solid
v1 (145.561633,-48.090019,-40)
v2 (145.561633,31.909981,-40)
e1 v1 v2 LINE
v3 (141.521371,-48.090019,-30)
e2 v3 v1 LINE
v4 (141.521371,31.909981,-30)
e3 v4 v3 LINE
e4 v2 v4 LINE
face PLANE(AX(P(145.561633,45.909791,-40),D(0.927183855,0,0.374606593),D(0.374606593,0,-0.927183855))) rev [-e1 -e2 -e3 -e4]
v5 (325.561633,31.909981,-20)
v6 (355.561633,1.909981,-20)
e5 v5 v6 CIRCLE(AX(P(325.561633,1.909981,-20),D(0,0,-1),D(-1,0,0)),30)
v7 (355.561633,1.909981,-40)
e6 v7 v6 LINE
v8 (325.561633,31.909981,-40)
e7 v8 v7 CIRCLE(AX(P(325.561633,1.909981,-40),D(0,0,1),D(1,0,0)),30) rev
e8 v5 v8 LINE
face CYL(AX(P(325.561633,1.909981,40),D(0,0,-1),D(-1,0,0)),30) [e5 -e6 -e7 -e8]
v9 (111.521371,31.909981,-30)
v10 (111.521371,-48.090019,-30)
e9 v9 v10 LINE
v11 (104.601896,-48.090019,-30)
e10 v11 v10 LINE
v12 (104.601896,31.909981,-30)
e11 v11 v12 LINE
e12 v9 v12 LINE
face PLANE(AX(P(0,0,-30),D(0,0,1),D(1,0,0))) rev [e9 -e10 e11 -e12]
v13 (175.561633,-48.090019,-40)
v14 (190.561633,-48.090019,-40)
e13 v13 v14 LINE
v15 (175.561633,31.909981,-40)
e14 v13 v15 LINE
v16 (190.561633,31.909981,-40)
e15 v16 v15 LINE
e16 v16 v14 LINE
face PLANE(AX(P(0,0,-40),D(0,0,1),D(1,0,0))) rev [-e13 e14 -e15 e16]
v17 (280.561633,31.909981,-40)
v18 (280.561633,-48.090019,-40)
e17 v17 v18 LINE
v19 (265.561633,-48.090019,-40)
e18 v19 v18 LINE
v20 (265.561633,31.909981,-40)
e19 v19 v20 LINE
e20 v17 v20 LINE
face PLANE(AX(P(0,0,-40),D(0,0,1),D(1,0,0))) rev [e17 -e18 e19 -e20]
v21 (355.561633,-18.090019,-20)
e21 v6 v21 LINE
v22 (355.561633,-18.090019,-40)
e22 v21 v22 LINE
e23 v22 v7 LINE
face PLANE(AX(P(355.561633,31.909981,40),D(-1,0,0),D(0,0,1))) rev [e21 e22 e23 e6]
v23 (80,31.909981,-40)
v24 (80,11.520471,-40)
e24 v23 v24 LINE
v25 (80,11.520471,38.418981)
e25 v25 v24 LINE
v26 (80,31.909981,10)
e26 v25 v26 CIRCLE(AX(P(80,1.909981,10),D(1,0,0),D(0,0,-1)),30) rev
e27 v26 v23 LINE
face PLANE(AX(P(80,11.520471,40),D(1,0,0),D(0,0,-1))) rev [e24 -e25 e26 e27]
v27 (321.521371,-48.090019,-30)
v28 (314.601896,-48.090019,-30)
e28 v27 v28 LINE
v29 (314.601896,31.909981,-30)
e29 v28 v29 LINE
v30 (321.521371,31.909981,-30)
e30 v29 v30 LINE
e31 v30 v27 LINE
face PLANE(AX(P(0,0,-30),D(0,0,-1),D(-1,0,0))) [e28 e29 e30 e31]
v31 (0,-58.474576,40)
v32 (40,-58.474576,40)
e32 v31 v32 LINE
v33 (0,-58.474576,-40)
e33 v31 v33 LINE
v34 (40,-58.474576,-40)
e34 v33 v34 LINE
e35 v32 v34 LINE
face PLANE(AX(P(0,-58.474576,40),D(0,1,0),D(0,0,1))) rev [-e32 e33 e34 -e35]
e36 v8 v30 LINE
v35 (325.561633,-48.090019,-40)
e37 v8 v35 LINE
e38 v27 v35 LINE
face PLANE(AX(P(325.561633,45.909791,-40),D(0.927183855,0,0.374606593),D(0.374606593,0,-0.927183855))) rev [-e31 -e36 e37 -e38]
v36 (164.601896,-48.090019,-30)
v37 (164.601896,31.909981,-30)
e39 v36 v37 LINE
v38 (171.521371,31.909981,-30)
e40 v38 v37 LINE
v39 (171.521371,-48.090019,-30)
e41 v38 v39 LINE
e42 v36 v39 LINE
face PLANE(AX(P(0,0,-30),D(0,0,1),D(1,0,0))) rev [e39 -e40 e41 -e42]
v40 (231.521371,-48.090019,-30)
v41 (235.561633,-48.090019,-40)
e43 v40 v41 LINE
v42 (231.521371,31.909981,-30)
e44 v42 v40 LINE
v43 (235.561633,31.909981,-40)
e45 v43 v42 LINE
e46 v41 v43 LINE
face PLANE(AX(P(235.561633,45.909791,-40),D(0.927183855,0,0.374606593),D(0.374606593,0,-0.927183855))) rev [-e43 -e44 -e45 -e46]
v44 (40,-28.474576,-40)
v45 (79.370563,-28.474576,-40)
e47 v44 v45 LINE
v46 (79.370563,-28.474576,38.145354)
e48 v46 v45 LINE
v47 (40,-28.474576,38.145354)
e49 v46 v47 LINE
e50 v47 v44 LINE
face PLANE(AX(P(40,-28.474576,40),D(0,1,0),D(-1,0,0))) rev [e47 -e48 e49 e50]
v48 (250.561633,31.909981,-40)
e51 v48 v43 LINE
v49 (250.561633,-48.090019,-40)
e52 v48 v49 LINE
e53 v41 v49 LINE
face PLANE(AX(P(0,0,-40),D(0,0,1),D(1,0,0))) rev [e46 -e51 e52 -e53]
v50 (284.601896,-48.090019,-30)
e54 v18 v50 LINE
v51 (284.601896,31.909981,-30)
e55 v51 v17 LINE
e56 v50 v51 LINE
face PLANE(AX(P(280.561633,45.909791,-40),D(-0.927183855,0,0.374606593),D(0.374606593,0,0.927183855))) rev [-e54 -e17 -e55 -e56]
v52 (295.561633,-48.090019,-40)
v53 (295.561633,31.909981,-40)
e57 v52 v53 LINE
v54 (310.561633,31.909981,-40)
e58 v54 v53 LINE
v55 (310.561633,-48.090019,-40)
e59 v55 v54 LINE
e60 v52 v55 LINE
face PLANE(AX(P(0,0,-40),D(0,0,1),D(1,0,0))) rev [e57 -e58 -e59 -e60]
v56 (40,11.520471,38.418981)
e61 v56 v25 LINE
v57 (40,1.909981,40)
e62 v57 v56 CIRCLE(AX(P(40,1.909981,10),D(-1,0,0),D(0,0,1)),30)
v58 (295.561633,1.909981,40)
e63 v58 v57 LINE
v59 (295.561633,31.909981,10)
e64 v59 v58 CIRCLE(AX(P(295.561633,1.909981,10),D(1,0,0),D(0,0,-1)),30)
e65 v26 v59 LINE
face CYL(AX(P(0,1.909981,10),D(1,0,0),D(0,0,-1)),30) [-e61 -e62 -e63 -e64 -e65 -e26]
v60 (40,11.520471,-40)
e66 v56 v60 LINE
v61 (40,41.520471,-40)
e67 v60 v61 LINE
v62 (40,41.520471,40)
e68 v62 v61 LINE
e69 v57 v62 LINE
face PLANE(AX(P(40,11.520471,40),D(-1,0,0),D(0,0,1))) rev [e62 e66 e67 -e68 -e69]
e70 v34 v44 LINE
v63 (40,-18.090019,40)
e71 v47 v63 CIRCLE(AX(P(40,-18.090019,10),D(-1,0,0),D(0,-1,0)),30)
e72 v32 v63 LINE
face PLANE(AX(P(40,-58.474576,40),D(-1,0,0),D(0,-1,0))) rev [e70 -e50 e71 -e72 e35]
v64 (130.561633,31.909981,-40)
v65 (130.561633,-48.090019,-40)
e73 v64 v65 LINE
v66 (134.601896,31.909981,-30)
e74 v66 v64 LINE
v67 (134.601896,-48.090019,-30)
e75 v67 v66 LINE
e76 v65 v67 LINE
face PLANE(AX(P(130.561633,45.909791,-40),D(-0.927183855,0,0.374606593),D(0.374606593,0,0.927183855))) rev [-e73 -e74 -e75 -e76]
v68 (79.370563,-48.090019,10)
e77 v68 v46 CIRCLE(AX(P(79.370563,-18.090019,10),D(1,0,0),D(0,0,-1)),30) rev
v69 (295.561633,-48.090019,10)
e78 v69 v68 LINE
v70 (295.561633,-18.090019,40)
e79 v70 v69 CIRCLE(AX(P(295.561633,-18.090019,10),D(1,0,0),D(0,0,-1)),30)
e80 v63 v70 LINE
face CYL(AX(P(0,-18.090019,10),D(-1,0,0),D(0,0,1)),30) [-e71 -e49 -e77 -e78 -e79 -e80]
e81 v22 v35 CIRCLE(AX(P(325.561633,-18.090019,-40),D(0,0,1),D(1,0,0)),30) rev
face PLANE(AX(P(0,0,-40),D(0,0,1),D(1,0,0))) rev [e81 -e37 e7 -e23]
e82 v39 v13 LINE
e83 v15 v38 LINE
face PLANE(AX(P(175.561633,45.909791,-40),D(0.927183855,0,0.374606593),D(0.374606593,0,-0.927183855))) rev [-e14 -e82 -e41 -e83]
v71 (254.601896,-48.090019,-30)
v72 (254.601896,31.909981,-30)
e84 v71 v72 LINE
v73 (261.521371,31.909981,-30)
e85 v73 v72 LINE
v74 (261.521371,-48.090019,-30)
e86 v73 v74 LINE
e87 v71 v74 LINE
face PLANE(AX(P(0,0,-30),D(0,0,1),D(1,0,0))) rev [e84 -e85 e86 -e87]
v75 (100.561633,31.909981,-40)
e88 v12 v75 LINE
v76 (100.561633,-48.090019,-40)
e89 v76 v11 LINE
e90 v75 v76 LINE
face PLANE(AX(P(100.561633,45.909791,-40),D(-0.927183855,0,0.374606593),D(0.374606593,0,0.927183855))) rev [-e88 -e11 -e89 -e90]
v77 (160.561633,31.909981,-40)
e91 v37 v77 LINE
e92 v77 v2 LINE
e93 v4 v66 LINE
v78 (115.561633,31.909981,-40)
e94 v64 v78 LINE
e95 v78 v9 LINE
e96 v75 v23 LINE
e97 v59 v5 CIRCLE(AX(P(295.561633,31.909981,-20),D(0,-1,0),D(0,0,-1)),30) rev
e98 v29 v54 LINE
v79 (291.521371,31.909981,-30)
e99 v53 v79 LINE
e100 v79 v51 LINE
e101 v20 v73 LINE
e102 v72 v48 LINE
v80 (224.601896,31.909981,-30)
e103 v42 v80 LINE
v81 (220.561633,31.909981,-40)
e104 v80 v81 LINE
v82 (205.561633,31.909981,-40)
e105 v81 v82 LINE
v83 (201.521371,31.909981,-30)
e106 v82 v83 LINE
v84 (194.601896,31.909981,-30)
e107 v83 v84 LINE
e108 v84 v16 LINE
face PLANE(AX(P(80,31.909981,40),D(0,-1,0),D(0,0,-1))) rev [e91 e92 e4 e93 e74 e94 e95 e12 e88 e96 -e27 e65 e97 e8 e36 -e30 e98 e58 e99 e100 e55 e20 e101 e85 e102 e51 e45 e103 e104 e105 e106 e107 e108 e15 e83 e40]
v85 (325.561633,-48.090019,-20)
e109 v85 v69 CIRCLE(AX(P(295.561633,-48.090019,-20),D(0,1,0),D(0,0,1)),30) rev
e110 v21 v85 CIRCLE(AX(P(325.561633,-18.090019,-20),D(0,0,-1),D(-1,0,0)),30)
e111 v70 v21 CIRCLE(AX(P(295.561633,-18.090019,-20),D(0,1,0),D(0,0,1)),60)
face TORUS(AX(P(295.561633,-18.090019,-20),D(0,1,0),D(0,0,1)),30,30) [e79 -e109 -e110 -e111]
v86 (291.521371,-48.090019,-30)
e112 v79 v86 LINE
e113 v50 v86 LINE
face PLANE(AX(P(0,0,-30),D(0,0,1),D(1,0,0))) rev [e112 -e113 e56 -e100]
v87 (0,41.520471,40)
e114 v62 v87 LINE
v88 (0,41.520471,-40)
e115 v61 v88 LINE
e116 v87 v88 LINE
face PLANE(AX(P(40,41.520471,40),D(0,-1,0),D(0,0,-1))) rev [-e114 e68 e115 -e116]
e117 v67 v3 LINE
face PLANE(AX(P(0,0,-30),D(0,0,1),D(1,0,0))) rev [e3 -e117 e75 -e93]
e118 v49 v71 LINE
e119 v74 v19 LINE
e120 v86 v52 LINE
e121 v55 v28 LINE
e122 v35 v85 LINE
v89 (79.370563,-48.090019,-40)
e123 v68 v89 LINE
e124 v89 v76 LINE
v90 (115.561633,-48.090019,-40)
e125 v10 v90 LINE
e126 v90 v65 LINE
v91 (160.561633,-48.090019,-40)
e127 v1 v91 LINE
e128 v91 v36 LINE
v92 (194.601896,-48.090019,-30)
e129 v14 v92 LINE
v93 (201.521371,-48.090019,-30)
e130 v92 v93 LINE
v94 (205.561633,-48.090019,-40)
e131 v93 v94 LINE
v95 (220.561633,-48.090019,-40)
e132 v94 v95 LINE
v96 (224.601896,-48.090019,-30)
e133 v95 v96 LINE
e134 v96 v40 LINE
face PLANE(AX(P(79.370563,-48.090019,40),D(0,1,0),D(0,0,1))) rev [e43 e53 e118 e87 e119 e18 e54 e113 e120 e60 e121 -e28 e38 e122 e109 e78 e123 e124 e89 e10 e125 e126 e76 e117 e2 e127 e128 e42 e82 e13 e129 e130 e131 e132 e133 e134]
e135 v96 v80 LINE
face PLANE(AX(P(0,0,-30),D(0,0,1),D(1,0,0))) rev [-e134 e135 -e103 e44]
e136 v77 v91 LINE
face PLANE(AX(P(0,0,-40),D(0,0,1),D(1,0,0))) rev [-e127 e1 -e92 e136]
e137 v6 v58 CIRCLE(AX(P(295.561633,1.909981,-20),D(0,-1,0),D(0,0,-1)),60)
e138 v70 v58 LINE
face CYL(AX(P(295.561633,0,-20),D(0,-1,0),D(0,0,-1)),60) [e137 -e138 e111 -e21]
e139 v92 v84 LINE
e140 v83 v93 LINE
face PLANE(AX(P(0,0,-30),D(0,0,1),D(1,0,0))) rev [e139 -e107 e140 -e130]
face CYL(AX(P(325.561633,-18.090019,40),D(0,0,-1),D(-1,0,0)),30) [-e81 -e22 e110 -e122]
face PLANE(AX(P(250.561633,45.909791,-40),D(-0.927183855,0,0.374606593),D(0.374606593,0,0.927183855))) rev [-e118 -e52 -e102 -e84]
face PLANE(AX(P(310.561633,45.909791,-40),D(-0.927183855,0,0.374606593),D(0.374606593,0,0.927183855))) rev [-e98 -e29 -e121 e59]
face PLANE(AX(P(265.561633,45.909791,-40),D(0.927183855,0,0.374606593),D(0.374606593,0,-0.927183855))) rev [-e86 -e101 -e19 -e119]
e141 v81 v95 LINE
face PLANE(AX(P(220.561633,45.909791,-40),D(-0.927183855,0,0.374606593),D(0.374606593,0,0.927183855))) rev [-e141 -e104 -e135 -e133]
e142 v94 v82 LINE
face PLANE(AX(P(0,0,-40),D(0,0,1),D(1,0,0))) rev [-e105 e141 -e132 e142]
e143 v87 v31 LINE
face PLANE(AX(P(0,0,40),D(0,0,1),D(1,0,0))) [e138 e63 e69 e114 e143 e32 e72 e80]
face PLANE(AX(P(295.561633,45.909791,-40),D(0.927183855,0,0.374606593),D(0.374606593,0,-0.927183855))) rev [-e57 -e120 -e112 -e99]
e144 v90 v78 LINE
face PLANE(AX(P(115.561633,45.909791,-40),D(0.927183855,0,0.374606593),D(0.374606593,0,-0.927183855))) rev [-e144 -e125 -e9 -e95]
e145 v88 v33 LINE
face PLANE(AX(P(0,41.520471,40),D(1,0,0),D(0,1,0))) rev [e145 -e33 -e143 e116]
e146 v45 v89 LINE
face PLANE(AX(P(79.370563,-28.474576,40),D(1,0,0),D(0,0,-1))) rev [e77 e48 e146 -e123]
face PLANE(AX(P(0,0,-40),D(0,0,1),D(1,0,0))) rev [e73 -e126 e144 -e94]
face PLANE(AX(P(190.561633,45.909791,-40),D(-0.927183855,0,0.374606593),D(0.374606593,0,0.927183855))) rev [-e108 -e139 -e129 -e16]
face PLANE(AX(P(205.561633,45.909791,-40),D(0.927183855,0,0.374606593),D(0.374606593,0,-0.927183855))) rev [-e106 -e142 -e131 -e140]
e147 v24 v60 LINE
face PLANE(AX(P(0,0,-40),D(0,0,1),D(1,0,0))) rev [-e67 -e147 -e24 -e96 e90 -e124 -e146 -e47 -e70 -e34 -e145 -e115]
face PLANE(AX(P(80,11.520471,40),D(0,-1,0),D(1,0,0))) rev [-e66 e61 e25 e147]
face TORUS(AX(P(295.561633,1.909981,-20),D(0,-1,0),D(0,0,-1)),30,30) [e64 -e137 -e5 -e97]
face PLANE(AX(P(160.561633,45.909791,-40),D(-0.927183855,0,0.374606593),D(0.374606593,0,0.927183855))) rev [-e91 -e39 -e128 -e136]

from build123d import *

# Parameters (mm, degrees)
BOSS_EXTRUDE1_DEPTH          = 40
FILLET1_R                    = 60
FILLET2_R                    = 30
SKETCH3_W                    = 15
SKETCH3_H                    = 109.922704731
CUT_EXTRUDE1_DEPTH           = 10
CUT_EXTRUDE1_DRAFT           = -22
CUT_EXTRUDE1_PROFILE_2_DEPTH = 10
CUT_EXTRUDE1_PROFILE_2_DRAFT = -22
CUT_EXTRUDE1_PROFILE_3_DEPTH = 10
CUT_EXTRUDE1_PROFILE_3_DRAFT = -22
CUT_EXTRUDE1_PROFILE_4_DEPTH = 10
CUT_EXTRUDE1_PROFILE_4_DRAFT = -22
CUT_EXTRUDE1_PROFILE_5_DEPTH = 10
CUT_EXTRUDE1_PROFILE_5_DRAFT = -22
CUT_EXTRUDE1_PROFILE_6_DEPTH = 10
CUT_EXTRUDE1_PROFILE_6_DRAFT = -22
CUT_EXTRUDE1_PROFILE_7_DEPTH = 10
CUT_EXTRUDE1_PROFILE_7_DRAFT = -22
CUT_EXTRUDE1_PROFILE_8_DEPTH = 10
CUT_EXTRUDE1_PROFILE_8_DRAFT = -22


with BuildPart() as part:
    # Sketch1 → Boss-Extrude1 (new, symmetric)
    with BuildSketch(Plane.XY):
        Polygon((0, 41.520471033), (0, -58.474576271), (40, -58.474576271), (40, -28.474576271), (79.370562847, -28.474576271), (79.370562847, -48.090018927), (355.561633386, -48.090018927), (355.561633386, -28.474576271), (355.561633386, 11.525423729), (355.561633386, 31.909981073), (80, 31.909981073), (80, 11.520471033), (40, 11.520471033), (40, 41.520471033), align=None)
    extrude(amount=BOSS_EXTRUDE1_DEPTH, both=True)

    # Fillet1
    fillet1_edges = [part.edges().sort_by_distance(p)[0] for p in [
        (355.561633386, -8.090018927, 40),
    ]]
    fillet(fillet1_edges, radius=FILLET1_R)

    # Fillet2
    # the kernel refuses this fillet: 30 mm, written as the material it takes off along each edge
    with BuildSketch(Plane(origin=(355.561633386, -48.090018927, -115), x_dir=(0, 1, 0), z_dir=(0, 0, 1)), Plane(origin=(355.561633386, 31.909981073, -115), x_dir=(-1, 0, 0), z_dir=(0, 0, 1))) as fillet2_piece_1:
        with BuildLine():
            CenterArc((FILLET2_R, FILLET2_R), FILLET2_R, 180, 90)
            Line((0, FILLET2_R), (0, 0))
            Line((0, 0), (FILLET2_R, 0))
        make_face()
    extrude(amount=95, mode=Mode.SUBTRACT)
    with BuildSketch(Plane(origin=(295.561633386, -48.090018927, -20), x_dir=(1, 0, 0), z_dir=(0, 0, -1))) as fillet2_piece_2:
        with BuildLine():
            CenterArc((60 - FILLET2_R, -FILLET2_R), FILLET2_R, 0, 90)
            Line((60 - FILLET2_R, 0), (60, 0))
            Line((60, 0), (60, -FILLET2_R))
        make_face()
    revolve(axis=Axis((295.561633386, -48.090018927, -20), (0, -1, 0)), revolution_arc=90, mode=Mode.SUBTRACT)
    with BuildSketch(Plane(origin=(295.561633386, 31.909981073, -20), x_dir=(1, 0, 0), z_dir=(0, 0, -1))) as fillet2_piece_3:
        with BuildLine():
            CenterArc((60 - FILLET2_R, FILLET2_R), FILLET2_R, 270, 90)
            Line((60, FILLET2_R), (60, 0))
            Line((60, 0), (60 - FILLET2_R, 0))
        make_face()
    revolve(axis=Axis((295.561633386, 31.909981073, -20), (0, -1, 0)), revolution_arc=90, mode=Mode.SUBTRACT)
    with BuildSketch(Plane(origin=(4.370562847, -48.090018927, 40), x_dir=(0, 1, 0), z_dir=(1, 0, 0))) as fillet2_piece_4_section:
        with BuildLine():
            CenterArc((FILLET2_R, -FILLET2_R), FILLET2_R, 90, 90)
            Line((0, -FILLET2_R), (0, 0))
            Line((0, 0), (FILLET2_R, 0))
        make_face()
    fillet2_piece_4 = extrude(amount=291.191070539, mode=Mode.PRIVATE)
    fillet2_piece_4 = split(fillet2_piece_4, bisect_by=Plane(origin=(40, -25.894757841, 39.446684124), z_dir=(1, 0, 0)), keep=Keep.TOP, mode=Mode.PRIVATE)
    add(fillet2_piece_4, mode=Mode.SUBTRACT)
    with BuildSketch(Plane(origin=(295.561633386, 31.909981073, 40), x_dir=(0, 0, -1), z_dir=(-1, 0, 0))) as fillet2_piece_5_section:
        with BuildLine():
            CenterArc((FILLET2_R, FILLET2_R), FILLET2_R, 180, 90)
            Line((0, FILLET2_R), (0, 0))
            Line((0, 0), (FILLET2_R, 0))
        make_face()
    fillet2_piece_5 = extrude(amount=290.561633386, mode=Mode.PRIVATE)
    fillet2_piece_5 = split(fillet2_piece_5, bisect_by=Plane(origin=(40, 26.935715602, 30.794780606), z_dir=(1, 0, 0)), keep=Keep.TOP, mode=Mode.PRIVATE)
    add(fillet2_piece_5, mode=Mode.SUBTRACT)


with BuildPart() as cut_extrude1_tool:
    # Sketch3 → Cut-Extrude1 (with draft: the straight prism first)
    with BuildSketch(Plane(origin=(0, 0, -40), x_dir=(-1, 0, 0), z_dir=(0, 0, -1))):
        with Locations((-318.061633386, -9.051561529)):
            Rectangle(SKETCH3_W, SKETCH3_H)
    extrude(amount=-CUT_EXTRUDE1_DEPTH)
    # Cut-Extrude1: the draft: its side faces are tilted about the plane it starts from
    cut_extrude1_sides = [cut_extrude1_tool.faces().sort_by_distance(p)[0] for p in [
        (325.561633386, -9.051561529, -35),
        (318.061633386, -64.012913894, -35),
        (310.561633386, -9.051561529, -35),
        (318.061633386, 45.909790837, -35),
    ]]
    draft(cut_extrude1_sides, Plane(origin=(0, 0, -40), x_dir=(-1, 0, 0), z_dir=(0, 0, -1)), CUT_EXTRUDE1_DRAFT)


with BuildPart() as part_1:
    add(part.part)

    # Cut-Extrude1: cut by cut_extrude1_tool
    add(cut_extrude1_tool.part, mode=Mode.SUBTRACT)


with BuildPart() as cut_extrude1_profile_2_tool:
    # Sketch3 → Cut-Extrude1 profile 2 (with draft: the straight prism first)
    with BuildSketch(Plane(origin=(0, 0, -40), x_dir=(-1, 0, 0), z_dir=(0, 0, -1))):
        with Locations((-288.061633386, -9.051561529)):
            Rectangle(SKETCH3_W, SKETCH3_H)
    extrude(amount=-CUT_EXTRUDE1_PROFILE_2_DEPTH)
    # Cut-Extrude1 profile 2: the draft: its side faces are tilted about the plane it starts from
    cut_extrude1_profile_2_sides = [cut_extrude1_profile_2_tool.faces().sort_by_distance(p)[0] for p in [
        (295.561633386, -9.051561529, -35),
        (288.061633386, -64.012913894, -35),
        (280.561633386, -9.051561529, -35),
        (288.061633386, 45.909790837, -35),
    ]]
    draft(cut_extrude1_profile_2_sides, Plane(origin=(0, 0, -40), x_dir=(-1, 0, 0), z_dir=(0, 0, -1)), CUT_EXTRUDE1_PROFILE_2_DRAFT)


with BuildPart() as part_2:
    add(part_1.part)

    # Cut-Extrude1 profile 2: cut by cut_extrude1_profile_2_tool
    add(cut_extrude1_profile_2_tool.part, mode=Mode.SUBTRACT)


with BuildPart() as cut_extrude1_profile_3_tool:
    # Sketch3 → Cut-Extrude1 profile 3 (with draft: the straight prism first)
    with BuildSketch(Plane(origin=(0, 0, -40), x_dir=(-1, 0, 0), z_dir=(0, 0, -1))):
        with Locations((-258.061633386, -9.051561529)):
            Rectangle(SKETCH3_W, SKETCH3_H)
    extrude(amount=-CUT_EXTRUDE1_PROFILE_3_DEPTH)
    # Cut-Extrude1 profile 3: the draft: its side faces are tilted about the plane it starts from
    cut_extrude1_profile_3_sides = [cut_extrude1_profile_3_tool.faces().sort_by_distance(p)[0] for p in [
        (265.561633386, -9.051561529, -35),
        (258.061633386, -64.012913894, -35),
        (250.561633386, -9.051561529, -35),
        (258.061633386, 45.909790837, -35),
    ]]
    draft(cut_extrude1_profile_3_sides, Plane(origin=(0, 0, -40), x_dir=(-1, 0, 0), z_dir=(0, 0, -1)), CUT_EXTRUDE1_PROFILE_3_DRAFT)


with BuildPart() as part_3:
    add(part_2.part)

    # Cut-Extrude1 profile 3: cut by cut_extrude1_profile_3_tool
    add(cut_extrude1_profile_3_tool.part, mode=Mode.SUBTRACT)


with BuildPart() as cut_extrude1_profile_4_tool:
    # Sketch3 → Cut-Extrude1 profile 4 (with draft: the straight prism first)
    with BuildSketch(Plane(origin=(0, 0, -40), x_dir=(-1, 0, 0), z_dir=(0, 0, -1))):
        with Locations((-228.061633386, -9.051561529)):
            Rectangle(SKETCH3_W, SKETCH3_H)
    extrude(amount=-CUT_EXTRUDE1_PROFILE_4_DEPTH)
    # Cut-Extrude1 profile 4: the draft: its side faces are tilted about the plane it starts from
    cut_extrude1_profile_4_sides = [cut_extrude1_profile_4_tool.faces().sort_by_distance(p)[0] for p in [
        (235.561633386, -9.051561529, -35),
        (228.061633386, -64.012913894, -35),
        (220.561633386, -9.051561529, -35),
        (228.061633386, 45.909790837, -35),
    ]]
    draft(cut_extrude1_profile_4_sides, Plane(origin=(0, 0, -40), x_dir=(-1, 0, 0), z_dir=(0, 0, -1)), CUT_EXTRUDE1_PROFILE_4_DRAFT)


with BuildPart() as part_4:
    add(part_3.part)

    # Cut-Extrude1 profile 4: cut by cut_extrude1_profile_4_tool
    add(cut_extrude1_profile_4_tool.part, mode=Mode.SUBTRACT)


with BuildPart() as cut_extrude1_profile_5_tool:
    # Sketch3 → Cut-Extrude1 profile 5 (with draft: the straight prism first)
    with BuildSketch(Plane(origin=(0, 0, -40), x_dir=(-1, 0, 0), z_dir=(0, 0, -1))):
        with Locations((-198.061633386, -9.051561529)):
            Rectangle(SKETCH3_W, SKETCH3_H)
    extrude(amount=-CUT_EXTRUDE1_PROFILE_5_DEPTH)
    # Cut-Extrude1 profile 5: the draft: its side faces are tilted about the plane it starts from
    cut_extrude1_profile_5_sides = [cut_extrude1_profile_5_tool.faces().sort_by_distance(p)[0] for p in [
        (205.561633386, -9.051561529, -35),
        (198.061633386, -64.012913894, -35),
        (190.561633386, -9.051561529, -35),
        (198.061633386, 45.909790837, -35),
    ]]
    draft(cut_extrude1_profile_5_sides, Plane(origin=(0, 0, -40), x_dir=(-1, 0, 0), z_dir=(0, 0, -1)), CUT_EXTRUDE1_PROFILE_5_DRAFT)


with BuildPart() as part_5:
    add(part_4.part)

    # Cut-Extrude1 profile 5: cut by cut_extrude1_profile_5_tool
    add(cut_extrude1_profile_5_tool.part, mode=Mode.SUBTRACT)


with BuildPart() as cut_extrude1_profile_6_tool:
    # Sketch3 → Cut-Extrude1 profile 6 (with draft: the straight prism first)
    with BuildSketch(Plane(origin=(0, 0, -40), x_dir=(-1, 0, 0), z_dir=(0, 0, -1))):
        with Locations((-168.061633386, -9.051561529)):
            Rectangle(SKETCH3_W, SKETCH3_H)
    extrude(amount=-CUT_EXTRUDE1_PROFILE_6_DEPTH)
    # Cut-Extrude1 profile 6: the draft: its side faces are tilted about the plane it starts from
    cut_extrude1_profile_6_sides = [cut_extrude1_profile_6_tool.faces().sort_by_distance(p)[0] for p in [
        (175.561633386, -9.051561529, -35),
        (168.061633386, -64.012913894, -35),
        (160.561633386, -9.051561529, -35),
        (168.061633386, 45.909790837, -35),
    ]]
    draft(cut_extrude1_profile_6_sides, Plane(origin=(0, 0, -40), x_dir=(-1, 0, 0), z_dir=(0, 0, -1)), CUT_EXTRUDE1_PROFILE_6_DRAFT)


with BuildPart() as part_6:
    add(part_5.part)

    # Cut-Extrude1 profile 6: cut by cut_extrude1_profile_6_tool
    add(cut_extrude1_profile_6_tool.part, mode=Mode.SUBTRACT)


with BuildPart() as cut_extrude1_profile_7_tool:
    # Sketch3 → Cut-Extrude1 profile 7 (with draft: the straight prism first)
    with BuildSketch(Plane(origin=(0, 0, -40), x_dir=(-1, 0, 0), z_dir=(0, 0, -1))):
        with Locations((-138.061633386, -9.051561529)):
            Rectangle(SKETCH3_W, SKETCH3_H)
    extrude(amount=-CUT_EXTRUDE1_PROFILE_7_DEPTH)
    # Cut-Extrude1 profile 7: the draft: its side faces are tilted about the plane it starts from
    cut_extrude1_profile_7_sides = [cut_extrude1_profile_7_tool.faces().sort_by_distance(p)[0] for p in [
        (145.561633386, -9.051561529, -35),
        (138.061633386, -64.012913894, -35),
        (130.561633386, -9.051561529, -35),
        (138.061633386, 45.909790837, -35),
    ]]
    draft(cut_extrude1_profile_7_sides, Plane(origin=(0, 0, -40), x_dir=(-1, 0, 0), z_dir=(0, 0, -1)), CUT_EXTRUDE1_PROFILE_7_DRAFT)


with BuildPart() as part_7:
    add(part_6.part)

    # Cut-Extrude1 profile 7: cut by cut_extrude1_profile_7_tool
    add(cut_extrude1_profile_7_tool.part, mode=Mode.SUBTRACT)


with BuildPart() as cut_extrude1_profile_8_tool:
    # Sketch3 → Cut-Extrude1 profile 8 (with draft: the straight prism first)
    with BuildSketch(Plane(origin=(0, 0, -40), x_dir=(-1, 0, 0), z_dir=(0, 0, -1))):
        with Locations((-108.061633386, -9.051561529)):
            Rectangle(SKETCH3_W, SKETCH3_H)
    extrude(amount=-CUT_EXTRUDE1_PROFILE_8_DEPTH)
    # Cut-Extrude1 profile 8: the draft: its side faces are tilted about the plane it starts from
    cut_extrude1_profile_8_sides = [cut_extrude1_profile_8_tool.faces().sort_by_distance(p)[0] for p in [
        (115.561633386, -9.051561529, -35),
        (108.061633386, -64.012913894, -35),
        (100.561633386, -9.051561529, -35),
        (108.061633386, 45.909790837, -35),
    ]]
    draft(cut_extrude1_profile_8_sides, Plane(origin=(0, 0, -40), x_dir=(-1, 0, 0), z_dir=(0, 0, -1)), CUT_EXTRUDE1_PROFILE_8_DRAFT)


with BuildPart() as part_8:
    add(part_7.part)

    # Cut-Extrude1 profile 8: cut by cut_extrude1_profile_8_tool
    add(cut_extrude1_profile_8_tool.part, mode=Mode.SUBTRACT)


solid = part_8.part
